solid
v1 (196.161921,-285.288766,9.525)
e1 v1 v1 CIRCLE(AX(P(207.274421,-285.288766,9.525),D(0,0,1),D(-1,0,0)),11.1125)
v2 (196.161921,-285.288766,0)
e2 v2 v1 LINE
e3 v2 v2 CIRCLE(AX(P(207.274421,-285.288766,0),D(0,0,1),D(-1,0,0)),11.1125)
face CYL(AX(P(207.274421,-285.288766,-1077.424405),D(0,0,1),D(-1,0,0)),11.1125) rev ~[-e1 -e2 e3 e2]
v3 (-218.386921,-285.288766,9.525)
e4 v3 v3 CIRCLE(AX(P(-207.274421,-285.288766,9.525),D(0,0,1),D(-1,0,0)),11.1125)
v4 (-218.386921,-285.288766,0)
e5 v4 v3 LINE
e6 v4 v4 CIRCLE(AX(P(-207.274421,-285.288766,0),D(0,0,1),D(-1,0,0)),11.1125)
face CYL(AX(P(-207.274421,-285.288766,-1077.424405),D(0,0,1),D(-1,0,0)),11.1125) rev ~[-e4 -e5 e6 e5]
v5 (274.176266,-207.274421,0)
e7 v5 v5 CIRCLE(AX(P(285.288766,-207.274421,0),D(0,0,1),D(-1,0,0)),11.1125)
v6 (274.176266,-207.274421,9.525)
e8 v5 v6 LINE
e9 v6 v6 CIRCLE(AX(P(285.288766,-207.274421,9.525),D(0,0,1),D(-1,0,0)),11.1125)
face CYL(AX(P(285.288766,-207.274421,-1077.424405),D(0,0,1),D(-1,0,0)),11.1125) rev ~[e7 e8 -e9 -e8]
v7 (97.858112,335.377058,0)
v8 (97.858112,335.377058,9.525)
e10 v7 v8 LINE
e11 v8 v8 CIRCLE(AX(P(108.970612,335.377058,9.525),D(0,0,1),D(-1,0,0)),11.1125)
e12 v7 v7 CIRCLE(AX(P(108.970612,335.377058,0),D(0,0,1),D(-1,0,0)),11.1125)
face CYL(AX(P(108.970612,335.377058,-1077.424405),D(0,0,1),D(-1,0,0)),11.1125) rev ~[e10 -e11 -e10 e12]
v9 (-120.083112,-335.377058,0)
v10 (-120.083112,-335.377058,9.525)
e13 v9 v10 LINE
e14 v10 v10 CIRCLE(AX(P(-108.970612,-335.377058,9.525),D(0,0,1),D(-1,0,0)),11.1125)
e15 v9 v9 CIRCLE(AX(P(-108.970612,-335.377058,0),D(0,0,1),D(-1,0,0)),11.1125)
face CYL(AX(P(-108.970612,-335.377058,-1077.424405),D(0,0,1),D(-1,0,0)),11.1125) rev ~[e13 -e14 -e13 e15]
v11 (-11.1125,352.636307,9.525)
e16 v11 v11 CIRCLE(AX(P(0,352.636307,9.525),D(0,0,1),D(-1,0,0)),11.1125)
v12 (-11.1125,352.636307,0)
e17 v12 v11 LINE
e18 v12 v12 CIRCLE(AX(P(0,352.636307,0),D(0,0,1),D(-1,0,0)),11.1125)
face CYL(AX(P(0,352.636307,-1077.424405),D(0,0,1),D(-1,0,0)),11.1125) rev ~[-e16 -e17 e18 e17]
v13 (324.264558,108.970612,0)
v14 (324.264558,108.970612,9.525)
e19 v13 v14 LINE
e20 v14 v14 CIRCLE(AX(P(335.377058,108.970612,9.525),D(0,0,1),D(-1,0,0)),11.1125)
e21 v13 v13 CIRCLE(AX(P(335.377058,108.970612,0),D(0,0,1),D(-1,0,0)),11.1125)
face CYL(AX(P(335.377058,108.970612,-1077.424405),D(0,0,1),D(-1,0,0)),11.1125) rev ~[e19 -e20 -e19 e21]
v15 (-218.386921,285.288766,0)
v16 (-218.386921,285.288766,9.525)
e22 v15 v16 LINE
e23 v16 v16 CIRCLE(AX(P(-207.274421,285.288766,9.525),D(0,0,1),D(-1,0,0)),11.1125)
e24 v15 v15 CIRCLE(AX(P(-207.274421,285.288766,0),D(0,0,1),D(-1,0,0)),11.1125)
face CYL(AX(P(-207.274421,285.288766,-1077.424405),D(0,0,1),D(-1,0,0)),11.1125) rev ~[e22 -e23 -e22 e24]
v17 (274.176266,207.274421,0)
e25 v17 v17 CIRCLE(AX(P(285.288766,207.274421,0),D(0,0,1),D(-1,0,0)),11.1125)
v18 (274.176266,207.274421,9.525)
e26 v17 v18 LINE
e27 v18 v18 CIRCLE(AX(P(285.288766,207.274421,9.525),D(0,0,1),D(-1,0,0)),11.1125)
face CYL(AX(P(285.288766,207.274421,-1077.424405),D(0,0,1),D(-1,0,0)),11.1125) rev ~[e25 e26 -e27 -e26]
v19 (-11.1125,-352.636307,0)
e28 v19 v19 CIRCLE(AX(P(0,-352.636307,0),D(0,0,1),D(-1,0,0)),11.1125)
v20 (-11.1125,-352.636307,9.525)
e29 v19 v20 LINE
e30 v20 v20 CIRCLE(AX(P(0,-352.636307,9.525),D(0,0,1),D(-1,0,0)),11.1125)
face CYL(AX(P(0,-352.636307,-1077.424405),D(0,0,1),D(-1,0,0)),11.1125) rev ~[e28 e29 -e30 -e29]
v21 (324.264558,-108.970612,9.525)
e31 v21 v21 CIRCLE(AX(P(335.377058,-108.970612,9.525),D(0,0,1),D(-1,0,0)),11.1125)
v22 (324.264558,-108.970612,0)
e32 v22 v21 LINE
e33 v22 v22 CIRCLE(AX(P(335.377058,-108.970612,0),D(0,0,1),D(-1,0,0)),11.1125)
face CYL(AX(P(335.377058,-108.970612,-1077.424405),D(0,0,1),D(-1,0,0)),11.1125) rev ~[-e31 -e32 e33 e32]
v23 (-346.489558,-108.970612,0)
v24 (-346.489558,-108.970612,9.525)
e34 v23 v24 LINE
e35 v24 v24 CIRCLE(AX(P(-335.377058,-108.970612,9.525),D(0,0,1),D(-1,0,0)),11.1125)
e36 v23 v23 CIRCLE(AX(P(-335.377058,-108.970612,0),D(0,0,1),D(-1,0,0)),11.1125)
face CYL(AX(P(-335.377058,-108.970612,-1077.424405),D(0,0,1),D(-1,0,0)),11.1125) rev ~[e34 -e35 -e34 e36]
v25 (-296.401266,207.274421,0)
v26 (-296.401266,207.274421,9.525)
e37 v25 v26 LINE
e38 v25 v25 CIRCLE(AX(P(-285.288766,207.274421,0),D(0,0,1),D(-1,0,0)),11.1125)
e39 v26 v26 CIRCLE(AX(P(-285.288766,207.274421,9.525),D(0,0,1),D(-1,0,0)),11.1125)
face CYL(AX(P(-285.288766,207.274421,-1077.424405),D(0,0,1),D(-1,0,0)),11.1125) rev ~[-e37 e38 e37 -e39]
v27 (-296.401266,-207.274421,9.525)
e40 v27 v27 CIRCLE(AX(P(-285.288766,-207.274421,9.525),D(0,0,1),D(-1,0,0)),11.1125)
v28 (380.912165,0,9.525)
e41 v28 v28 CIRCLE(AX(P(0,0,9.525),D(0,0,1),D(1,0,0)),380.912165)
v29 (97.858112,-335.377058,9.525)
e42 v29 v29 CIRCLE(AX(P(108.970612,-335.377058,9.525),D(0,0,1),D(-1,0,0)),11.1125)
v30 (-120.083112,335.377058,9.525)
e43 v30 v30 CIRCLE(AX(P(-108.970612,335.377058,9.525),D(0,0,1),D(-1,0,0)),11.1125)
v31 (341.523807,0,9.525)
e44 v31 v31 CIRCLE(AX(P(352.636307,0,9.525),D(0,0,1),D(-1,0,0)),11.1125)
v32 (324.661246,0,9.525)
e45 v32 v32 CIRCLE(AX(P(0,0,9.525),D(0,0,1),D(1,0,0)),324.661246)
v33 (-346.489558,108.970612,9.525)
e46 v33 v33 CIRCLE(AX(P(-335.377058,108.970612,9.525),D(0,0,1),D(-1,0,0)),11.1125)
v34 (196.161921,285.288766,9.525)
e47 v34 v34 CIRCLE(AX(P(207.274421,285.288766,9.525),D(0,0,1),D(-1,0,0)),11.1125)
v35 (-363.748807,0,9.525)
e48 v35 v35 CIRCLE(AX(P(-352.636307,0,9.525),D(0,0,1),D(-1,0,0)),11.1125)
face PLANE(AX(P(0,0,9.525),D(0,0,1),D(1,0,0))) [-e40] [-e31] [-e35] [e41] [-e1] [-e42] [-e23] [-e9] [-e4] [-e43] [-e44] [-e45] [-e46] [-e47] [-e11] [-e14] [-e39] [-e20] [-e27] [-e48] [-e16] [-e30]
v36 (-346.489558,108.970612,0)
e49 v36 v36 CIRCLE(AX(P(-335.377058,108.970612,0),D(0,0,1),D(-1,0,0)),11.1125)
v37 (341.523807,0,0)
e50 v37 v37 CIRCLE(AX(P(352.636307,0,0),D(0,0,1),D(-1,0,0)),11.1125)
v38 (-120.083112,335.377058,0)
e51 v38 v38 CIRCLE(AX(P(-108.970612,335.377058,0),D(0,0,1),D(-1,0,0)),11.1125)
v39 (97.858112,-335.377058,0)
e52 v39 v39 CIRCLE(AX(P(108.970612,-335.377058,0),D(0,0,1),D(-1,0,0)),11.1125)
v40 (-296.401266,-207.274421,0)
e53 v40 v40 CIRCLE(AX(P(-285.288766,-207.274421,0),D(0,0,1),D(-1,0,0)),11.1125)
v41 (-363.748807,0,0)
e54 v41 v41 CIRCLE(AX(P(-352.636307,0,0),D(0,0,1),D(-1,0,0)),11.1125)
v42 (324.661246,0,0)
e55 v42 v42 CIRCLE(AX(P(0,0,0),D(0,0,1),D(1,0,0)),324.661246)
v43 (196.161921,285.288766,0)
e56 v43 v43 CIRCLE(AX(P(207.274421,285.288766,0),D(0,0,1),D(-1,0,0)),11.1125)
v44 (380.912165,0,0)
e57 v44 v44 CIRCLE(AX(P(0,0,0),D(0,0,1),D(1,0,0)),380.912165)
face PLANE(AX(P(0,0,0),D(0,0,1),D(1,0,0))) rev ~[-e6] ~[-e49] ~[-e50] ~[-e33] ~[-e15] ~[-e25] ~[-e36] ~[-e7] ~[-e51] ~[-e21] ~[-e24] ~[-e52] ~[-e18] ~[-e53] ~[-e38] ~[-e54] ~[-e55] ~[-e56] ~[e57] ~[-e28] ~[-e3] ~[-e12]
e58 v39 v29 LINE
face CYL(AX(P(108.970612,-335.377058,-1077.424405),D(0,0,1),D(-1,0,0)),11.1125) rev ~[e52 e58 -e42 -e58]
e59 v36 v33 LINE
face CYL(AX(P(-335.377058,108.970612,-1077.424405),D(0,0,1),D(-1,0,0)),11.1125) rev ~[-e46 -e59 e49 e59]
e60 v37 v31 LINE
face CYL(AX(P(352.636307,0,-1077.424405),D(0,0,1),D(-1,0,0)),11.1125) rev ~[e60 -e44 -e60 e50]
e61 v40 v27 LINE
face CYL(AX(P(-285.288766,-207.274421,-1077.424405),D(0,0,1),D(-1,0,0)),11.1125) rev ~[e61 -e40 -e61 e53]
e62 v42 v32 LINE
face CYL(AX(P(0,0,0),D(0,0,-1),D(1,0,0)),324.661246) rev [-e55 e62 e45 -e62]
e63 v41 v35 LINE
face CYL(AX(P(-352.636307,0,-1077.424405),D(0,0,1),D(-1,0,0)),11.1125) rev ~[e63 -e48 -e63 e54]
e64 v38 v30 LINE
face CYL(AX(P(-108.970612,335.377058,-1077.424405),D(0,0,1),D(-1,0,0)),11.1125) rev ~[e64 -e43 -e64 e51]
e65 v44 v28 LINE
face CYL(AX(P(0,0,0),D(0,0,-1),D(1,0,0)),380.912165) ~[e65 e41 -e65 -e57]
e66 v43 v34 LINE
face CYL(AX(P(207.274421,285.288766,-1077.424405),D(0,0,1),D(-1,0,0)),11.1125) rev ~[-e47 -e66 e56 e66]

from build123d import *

# Parameters (mm, degrees)
F0_R     = 380.9121654934
F0_R_2   = 324.6612464713
F2_DEPTH = 9.525
F5_D     = 22.225


# Not quite as in the source:
# - a feature names something its author has since deleted; it is built from what else it names
# - the program builds the solid bodies; features that only make, move or delete a surface that nothing else refers to are left out


with BuildPart() as f2:
    # F0 (on Top) → F2 (new body)
    with BuildSketch(Plane.XY):
        Circle(F0_R)
        Circle(F0_R_2, mode=Mode.SUBTRACT)
    extrude(amount=F2_DEPTH)

    # F5 (through all)
    with Locations(Plane(origin=(0, 0, 0), x_dir=(1, 0, 0), z_dir=(0, 0, -1))):
        with Locations((-285.2887655833, -207.2744209584), (-335.3770581092, -108.9706118443), (-352.636307478, 0), (-335.3770581092, 108.9706118443), (-285.2887655833, 207.2744209584), (-207.2744209584, 285.2887655833), (-108.9706118443, 335.3770581092), (0, 352.636307478), (108.9706118443, 335.3770581092), (207.2744209584, 285.2887655833), (285.2887655833, 207.2744209584), (335.3770581092, 108.9706118443), (352.636307478, 0), (335.3770581092, -108.9706118443), (285.2887655833, -207.2744209584), (207.2744209584, -285.2887655833), (108.9706118443, -335.3770581092), (0, -352.636307478), (-108.9706118443, -335.3770581092), (-207.2744209584, -285.2887655833)):
            Hole(F5_D / 2)


solid = f2.part
